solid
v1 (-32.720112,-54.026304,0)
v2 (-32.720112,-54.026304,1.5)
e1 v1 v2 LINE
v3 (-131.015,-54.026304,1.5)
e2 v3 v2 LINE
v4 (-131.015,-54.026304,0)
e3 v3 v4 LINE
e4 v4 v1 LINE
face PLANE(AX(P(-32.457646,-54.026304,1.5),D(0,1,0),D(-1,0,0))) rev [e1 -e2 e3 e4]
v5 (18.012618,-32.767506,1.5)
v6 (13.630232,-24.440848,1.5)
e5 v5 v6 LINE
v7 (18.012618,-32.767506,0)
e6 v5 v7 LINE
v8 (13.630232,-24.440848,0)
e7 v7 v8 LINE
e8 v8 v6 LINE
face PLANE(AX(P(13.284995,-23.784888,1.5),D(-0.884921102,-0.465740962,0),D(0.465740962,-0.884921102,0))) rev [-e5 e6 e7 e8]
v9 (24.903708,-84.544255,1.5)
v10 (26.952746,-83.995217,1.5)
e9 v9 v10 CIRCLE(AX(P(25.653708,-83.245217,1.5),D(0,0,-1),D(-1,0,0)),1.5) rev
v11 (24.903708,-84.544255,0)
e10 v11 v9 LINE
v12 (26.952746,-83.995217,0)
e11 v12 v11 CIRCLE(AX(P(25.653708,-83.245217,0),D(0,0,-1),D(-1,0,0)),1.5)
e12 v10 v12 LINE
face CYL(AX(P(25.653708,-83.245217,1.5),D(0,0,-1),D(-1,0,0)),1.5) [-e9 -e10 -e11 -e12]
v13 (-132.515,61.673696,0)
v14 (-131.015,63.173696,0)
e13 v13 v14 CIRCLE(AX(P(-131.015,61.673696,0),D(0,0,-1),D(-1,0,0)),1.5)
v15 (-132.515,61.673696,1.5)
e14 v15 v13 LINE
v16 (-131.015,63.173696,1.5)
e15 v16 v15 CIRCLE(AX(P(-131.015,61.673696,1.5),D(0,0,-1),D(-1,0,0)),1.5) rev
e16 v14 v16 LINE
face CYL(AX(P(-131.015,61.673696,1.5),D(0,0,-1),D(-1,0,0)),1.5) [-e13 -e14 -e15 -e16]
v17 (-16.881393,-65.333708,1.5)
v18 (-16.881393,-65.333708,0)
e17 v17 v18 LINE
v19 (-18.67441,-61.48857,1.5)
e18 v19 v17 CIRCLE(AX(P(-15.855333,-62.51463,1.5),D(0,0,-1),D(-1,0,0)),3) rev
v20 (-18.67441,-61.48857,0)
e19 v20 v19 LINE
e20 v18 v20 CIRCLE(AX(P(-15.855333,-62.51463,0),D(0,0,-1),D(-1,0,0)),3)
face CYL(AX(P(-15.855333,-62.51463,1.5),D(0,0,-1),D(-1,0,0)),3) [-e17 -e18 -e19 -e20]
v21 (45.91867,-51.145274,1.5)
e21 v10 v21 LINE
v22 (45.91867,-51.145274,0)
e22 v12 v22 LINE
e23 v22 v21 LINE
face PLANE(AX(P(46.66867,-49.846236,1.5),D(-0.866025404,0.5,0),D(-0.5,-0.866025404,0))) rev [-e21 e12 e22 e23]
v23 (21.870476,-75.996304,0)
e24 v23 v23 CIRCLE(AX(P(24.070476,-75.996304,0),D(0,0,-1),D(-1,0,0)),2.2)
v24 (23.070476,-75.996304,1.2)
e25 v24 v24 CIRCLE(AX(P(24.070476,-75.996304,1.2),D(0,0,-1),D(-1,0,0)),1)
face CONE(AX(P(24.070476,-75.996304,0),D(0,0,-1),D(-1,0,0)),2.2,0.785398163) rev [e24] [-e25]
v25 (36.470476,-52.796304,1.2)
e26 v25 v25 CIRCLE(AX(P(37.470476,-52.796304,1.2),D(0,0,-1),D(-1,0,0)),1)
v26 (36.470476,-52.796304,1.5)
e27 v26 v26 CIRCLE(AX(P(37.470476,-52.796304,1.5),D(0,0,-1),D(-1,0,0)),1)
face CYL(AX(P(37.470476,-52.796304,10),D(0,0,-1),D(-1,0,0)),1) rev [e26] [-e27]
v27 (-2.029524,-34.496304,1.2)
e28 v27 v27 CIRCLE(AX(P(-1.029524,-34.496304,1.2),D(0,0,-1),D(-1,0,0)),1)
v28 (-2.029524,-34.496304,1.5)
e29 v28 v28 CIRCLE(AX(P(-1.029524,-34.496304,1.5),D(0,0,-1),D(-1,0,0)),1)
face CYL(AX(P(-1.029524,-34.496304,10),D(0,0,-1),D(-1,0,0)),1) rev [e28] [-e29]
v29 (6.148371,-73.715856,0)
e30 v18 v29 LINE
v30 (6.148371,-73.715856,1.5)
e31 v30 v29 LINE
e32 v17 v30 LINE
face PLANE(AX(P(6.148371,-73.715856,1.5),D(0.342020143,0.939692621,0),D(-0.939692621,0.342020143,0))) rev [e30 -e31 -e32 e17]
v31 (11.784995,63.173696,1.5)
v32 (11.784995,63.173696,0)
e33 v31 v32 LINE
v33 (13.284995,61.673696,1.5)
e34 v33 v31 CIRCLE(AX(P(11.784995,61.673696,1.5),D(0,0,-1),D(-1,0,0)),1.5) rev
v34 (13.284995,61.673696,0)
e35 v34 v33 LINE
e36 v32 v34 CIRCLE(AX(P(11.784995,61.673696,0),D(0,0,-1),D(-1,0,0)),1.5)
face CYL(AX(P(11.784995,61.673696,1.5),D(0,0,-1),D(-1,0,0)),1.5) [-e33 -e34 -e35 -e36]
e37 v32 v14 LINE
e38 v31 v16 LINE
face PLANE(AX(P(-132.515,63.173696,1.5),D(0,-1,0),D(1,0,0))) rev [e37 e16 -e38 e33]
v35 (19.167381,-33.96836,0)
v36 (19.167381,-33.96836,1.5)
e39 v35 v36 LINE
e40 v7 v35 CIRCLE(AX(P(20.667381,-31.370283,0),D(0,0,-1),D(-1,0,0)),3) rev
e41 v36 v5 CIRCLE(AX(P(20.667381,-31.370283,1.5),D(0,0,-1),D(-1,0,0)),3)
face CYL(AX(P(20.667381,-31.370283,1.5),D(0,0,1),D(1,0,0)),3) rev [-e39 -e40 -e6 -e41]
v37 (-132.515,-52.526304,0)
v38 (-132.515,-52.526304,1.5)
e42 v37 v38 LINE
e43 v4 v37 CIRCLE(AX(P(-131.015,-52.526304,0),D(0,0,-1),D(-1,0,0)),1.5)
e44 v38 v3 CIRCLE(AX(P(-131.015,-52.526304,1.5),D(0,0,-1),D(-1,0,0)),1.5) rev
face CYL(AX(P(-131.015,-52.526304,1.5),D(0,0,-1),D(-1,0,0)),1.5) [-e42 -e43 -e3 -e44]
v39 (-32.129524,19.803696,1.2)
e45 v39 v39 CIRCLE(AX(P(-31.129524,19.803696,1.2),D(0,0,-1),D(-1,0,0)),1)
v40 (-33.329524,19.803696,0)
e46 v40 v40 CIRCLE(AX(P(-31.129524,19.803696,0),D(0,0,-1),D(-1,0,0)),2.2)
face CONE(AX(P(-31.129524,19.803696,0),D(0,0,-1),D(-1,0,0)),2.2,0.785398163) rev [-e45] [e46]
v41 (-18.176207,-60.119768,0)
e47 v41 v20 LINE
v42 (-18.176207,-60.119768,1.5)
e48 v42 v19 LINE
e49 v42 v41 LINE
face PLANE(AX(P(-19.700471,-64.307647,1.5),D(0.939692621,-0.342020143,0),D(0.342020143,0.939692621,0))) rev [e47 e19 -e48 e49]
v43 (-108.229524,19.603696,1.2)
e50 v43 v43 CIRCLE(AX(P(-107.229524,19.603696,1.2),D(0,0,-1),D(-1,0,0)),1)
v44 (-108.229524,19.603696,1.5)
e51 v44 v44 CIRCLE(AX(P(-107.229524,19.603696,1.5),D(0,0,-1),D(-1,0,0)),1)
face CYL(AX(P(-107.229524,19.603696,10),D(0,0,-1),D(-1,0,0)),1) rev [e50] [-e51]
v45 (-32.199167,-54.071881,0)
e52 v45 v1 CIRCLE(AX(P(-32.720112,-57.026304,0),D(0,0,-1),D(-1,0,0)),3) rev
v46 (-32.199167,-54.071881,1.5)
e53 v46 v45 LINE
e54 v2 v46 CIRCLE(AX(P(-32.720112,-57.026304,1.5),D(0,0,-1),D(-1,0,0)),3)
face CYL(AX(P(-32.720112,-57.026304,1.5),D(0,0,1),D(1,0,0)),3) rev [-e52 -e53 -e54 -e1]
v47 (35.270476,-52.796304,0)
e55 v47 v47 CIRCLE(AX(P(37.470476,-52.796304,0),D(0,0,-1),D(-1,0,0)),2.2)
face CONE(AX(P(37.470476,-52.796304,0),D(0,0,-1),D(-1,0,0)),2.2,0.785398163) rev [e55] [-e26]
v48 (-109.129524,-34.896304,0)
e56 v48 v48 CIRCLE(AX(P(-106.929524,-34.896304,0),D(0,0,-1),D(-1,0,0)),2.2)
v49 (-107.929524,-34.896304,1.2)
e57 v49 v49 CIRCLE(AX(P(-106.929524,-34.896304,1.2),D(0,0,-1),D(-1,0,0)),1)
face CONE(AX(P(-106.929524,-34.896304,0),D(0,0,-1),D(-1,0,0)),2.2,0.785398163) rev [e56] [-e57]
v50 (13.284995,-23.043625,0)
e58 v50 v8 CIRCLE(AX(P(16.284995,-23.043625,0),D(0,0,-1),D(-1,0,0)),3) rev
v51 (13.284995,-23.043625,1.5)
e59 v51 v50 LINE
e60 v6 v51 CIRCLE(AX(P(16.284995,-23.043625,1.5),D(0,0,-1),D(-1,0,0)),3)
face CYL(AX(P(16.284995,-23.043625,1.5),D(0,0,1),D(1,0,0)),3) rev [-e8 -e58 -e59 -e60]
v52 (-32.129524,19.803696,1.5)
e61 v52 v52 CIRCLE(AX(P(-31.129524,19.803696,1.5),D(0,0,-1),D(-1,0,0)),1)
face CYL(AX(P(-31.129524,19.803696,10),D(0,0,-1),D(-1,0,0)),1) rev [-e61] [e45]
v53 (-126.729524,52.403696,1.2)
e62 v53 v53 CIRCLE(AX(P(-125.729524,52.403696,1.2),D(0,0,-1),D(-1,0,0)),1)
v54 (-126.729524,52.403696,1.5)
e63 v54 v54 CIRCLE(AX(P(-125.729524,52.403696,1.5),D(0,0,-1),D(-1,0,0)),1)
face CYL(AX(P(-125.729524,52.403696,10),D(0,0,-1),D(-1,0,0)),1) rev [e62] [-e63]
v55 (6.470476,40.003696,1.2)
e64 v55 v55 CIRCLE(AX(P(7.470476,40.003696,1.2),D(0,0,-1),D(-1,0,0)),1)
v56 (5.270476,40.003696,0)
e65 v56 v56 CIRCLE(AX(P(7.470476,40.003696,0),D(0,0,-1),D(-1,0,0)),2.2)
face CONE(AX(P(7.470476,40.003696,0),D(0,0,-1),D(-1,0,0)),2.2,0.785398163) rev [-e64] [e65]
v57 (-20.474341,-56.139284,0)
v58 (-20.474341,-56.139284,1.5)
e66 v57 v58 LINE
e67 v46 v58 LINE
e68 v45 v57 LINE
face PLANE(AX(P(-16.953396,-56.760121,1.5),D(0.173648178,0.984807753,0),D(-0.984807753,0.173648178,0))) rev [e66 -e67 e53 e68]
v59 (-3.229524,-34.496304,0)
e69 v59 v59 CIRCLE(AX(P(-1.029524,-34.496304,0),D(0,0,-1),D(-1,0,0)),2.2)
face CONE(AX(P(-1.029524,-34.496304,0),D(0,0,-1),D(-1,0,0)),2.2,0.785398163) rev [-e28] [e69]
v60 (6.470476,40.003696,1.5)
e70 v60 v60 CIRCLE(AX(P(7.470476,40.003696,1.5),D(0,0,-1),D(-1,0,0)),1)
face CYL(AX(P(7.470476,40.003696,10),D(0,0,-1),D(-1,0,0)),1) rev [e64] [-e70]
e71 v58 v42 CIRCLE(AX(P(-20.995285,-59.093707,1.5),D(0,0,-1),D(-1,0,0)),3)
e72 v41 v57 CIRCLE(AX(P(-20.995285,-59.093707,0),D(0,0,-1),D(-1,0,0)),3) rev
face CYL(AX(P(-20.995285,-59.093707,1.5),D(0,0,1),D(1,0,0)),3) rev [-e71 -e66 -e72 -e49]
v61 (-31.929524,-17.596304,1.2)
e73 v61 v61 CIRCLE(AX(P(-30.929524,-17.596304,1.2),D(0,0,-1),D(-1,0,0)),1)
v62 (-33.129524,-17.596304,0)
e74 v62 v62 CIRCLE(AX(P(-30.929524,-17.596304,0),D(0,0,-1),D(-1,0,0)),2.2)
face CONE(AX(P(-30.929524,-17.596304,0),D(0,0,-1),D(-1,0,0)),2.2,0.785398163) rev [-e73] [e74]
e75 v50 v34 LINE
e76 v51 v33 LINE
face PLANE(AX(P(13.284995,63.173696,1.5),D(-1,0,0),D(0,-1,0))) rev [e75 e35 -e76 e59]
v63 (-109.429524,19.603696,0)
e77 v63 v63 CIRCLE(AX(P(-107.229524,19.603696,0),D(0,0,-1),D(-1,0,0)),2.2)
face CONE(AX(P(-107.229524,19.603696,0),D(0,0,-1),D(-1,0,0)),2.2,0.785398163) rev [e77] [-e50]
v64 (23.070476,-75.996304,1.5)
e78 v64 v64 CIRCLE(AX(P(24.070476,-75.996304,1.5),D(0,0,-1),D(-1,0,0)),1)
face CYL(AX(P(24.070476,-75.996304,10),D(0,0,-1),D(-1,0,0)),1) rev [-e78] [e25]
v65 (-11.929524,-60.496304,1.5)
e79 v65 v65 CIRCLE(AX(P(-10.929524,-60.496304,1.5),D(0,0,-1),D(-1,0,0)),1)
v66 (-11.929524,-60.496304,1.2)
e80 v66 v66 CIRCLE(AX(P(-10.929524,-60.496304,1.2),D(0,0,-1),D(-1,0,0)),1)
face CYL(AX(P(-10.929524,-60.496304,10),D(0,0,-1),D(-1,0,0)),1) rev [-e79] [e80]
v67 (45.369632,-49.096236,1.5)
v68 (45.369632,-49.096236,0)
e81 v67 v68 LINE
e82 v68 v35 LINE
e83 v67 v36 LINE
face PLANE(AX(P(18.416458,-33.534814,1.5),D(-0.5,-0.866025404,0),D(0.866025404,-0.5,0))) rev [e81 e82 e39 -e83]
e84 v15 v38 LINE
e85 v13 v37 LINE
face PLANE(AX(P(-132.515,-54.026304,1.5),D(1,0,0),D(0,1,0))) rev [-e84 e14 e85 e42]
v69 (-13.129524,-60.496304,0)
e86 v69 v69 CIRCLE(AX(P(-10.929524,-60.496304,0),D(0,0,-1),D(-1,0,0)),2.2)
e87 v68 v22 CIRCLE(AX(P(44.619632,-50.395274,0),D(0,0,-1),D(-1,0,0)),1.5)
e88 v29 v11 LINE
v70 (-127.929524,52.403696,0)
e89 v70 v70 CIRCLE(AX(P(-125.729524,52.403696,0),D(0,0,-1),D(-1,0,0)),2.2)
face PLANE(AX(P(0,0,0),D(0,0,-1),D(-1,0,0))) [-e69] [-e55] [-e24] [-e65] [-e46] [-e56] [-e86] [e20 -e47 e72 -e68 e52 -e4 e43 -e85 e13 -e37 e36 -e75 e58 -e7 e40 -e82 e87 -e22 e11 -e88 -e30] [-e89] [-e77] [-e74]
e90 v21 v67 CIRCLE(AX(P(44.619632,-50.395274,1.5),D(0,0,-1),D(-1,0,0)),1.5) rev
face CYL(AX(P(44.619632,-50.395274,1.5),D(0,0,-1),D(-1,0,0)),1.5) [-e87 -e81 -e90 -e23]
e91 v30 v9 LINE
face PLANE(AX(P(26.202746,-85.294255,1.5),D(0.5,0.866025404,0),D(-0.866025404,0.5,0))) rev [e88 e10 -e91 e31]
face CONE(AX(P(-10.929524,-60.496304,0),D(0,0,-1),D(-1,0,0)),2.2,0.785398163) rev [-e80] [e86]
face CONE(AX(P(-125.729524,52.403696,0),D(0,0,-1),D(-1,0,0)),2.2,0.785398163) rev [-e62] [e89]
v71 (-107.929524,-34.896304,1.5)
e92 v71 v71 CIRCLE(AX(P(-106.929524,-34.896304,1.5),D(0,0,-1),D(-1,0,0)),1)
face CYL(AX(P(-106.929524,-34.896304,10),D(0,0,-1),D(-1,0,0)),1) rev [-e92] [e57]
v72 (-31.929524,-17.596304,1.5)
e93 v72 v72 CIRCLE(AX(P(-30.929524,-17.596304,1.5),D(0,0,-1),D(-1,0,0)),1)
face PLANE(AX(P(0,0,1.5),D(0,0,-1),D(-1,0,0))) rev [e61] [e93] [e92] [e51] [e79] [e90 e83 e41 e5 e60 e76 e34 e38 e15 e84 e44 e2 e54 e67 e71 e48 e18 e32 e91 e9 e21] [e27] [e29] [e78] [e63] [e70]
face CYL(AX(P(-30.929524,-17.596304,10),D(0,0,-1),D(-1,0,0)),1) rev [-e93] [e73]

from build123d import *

# Parameters (mm, degrees)
BOSS_EXTRUDE1_DEPTH = 1.5
SKETCH6_R           = 1
CUT_EXTRUDE1_DEPTH  = 10
FILLET4_R           = 1.5
FILLET5_R           = 3


# Read off the part's stored shape, not the designer's step: AdvancedHole1
with BuildPart() as part:
    # Sketch1 → Boss-Extrude1 (new body)
    with BuildSketch(Plane.XY):
        Polygon((-132.514999879, 63.173696093), (13.284995002, 63.173696093), (13.284995002, -23.784888353), (18.416457767, -33.534813854), (46.668669763, -49.846236055), (26.202746282, -85.294255348), (6.148371034, -73.7158564), (-19.700470814, -64.307647377), (-16.953396025, -56.760121426), (-32.457645619, -54.026303907), (-132.514999879, -54.026303907), align=None)
    extrude(amount=BOSS_EXTRUDE1_DEPTH)

    # Sketch6 → Cut-Extrude1 (cut)
    with BuildSketch(Plane(origin=(0, 0, 0), x_dir=(-1, 0, 0), z_dir=(0, 0, -1))):
        with Locations((125.729523879, 52.403696093)):
            Circle(SKETCH6_R)
        with Locations((106.929523879, -34.896303907)):
            Circle(SKETCH6_R)
        with Locations((30.929523879, -17.596303907)):
            Circle(SKETCH6_R)
        with Locations((31.129523879, 19.803696093)):
            Circle(SKETCH6_R)
        with Locations((-7.470476121, 40.003696093)):
            Circle(SKETCH6_R)
        with Locations((1.029523879, -34.496303907)):
            Circle(SKETCH6_R)
        with Locations((10.929523879, -60.496303907)):
            Circle(SKETCH6_R)
        with Locations((-37.470476121, -52.796303907)):
            Circle(SKETCH6_R)
        with Locations((-24.070476121, -75.996303907)):
            Circle(SKETCH6_R)
        with Locations((107.229523879, 19.603696093)):
            Circle(SKETCH6_R)
    extrude(amount=-CUT_EXTRUDE1_DEPTH, mode=Mode.SUBTRACT)

    # AdvancedHole1 outline → AdvancedHole1 (revolve, cut)
    with BuildSketch(Plane(origin=(37.470476121, -52.796303907, 0), x_dir=(1, 0, 0), z_dir=(0, -1, 0))):
        Polygon((2.2, 0), (1, 1.2), (1, 0), align=None)
    revolve(axis=Axis((37.470476121, -52.796303907, 0), (0, 0, 1)), mode=Mode.SUBTRACT)

    # AdvancedHole1 2 outline → AdvancedHole1 2 (revolve, cut)
    with BuildSketch(Plane(origin=(24.070476121, -75.996303907, 0), x_dir=(1, 0, 0), z_dir=(0, -1, 0))):
        Polygon((2.2, 0), (1, 1.2), (1, 0), align=None)
    revolve(axis=Axis((24.070476121, -75.996303907, 0), (0, 0, 1)), mode=Mode.SUBTRACT)

    # AdvancedHole1 3 outline → AdvancedHole1 3 (revolve, cut)
    with BuildSketch(Plane(origin=(-10.929523879, -60.496303907, 0), x_dir=(1, 0, 0), z_dir=(0, -1, 0))):
        Polygon((2.2, 0), (1, 1.2), (1, 0), align=None)
    revolve(axis=Axis((-10.929523879, -60.496303907, 0), (0, 0, 1)), mode=Mode.SUBTRACT)

    # AdvancedHole1 4 outline → AdvancedHole1 4 (revolve, cut)
    with BuildSketch(Plane(origin=(-1.029523879, -34.496303907, 0), x_dir=(1, 0, 0), z_dir=(0, -1, 0))):
        Polygon((2.2, 0), (1, 1.2), (1, 0), align=None)
    revolve(axis=Axis((-1.029523879, -34.496303907, 0), (0, 0, 1)), mode=Mode.SUBTRACT)

    # AdvancedHole1 5 outline → AdvancedHole1 5 (revolve, cut)
    with BuildSketch(Plane(origin=(-30.929523879, -17.596303907, 0), x_dir=(1, 0, 0), z_dir=(0, -1, 0))):
        Polygon((2.2, 0), (1, 1.2), (1, 0), align=None)
    revolve(axis=Axis((-30.929523879, -17.596303907, 0), (0, 0, 1)), mode=Mode.SUBTRACT)

    # AdvancedHole1 6 outline → AdvancedHole1 6 (revolve, cut)
    with BuildSketch(Plane(origin=(-106.929523879, -34.896303907, 0), x_dir=(1, 0, 0), z_dir=(0, -1, 0))):
        Polygon((2.2, 0), (1, 1.2), (1, 0), align=None)
    revolve(axis=Axis((-106.929523879, -34.896303907, 0), (0, 0, 1)), mode=Mode.SUBTRACT)

    # AdvancedHole1 7 outline → AdvancedHole1 7 (revolve, cut)
    with BuildSketch(Plane(origin=(-125.729523879, 52.403696093, 0), x_dir=(1, 0, 0), z_dir=(0, -1, 0))):
        Polygon((2.2, 0), (1, 1.2), (1, 0), align=None)
    revolve(axis=Axis((-125.729523879, 52.403696093, 0), (0, 0, 1)), mode=Mode.SUBTRACT)

    # AdvancedHole1 8 outline → AdvancedHole1 8 (revolve, cut)
    with BuildSketch(Plane(origin=(-31.129523879, 19.803696093, 0), x_dir=(1, 0, 0), z_dir=(0, -1, 0))):
        Polygon((2.2, 0), (1, 1.2), (1, 0), align=None)
    revolve(axis=Axis((-31.129523879, 19.803696093, 0), (0, 0, 1)), mode=Mode.SUBTRACT)

    # AdvancedHole1 9 outline → AdvancedHole1 9 (revolve, cut)
    with BuildSketch(Plane(origin=(-107.229523879, 19.603696093, 0), x_dir=(1, 0, 0), z_dir=(0, -1, 0))):
        Polygon((2.2, 0), (1, 1.2), (1, 0), align=None)
    revolve(axis=Axis((-107.229523879, 19.603696093, 0), (0, 0, 1)), mode=Mode.SUBTRACT)

    # AdvancedHole1 10 outline → AdvancedHole1 10 (revolve, cut)
    with BuildSketch(Plane(origin=(7.470476121, 40.003696093, 0), x_dir=(1, 0, 0), z_dir=(0, -1, 0))):
        Polygon((2.2, 0), (1, 1.2), (1, 0), align=None)
    revolve(axis=Axis((7.470476121, 40.003696093, 0), (0, 0, 1)), mode=Mode.SUBTRACT)

    # Fillet4
    fillet4_edges = [part.edges().sort_by_distance(p)[0] for p in [
        (-132.514999879, 63.173696093, 0.75),
        (13.284995002, 63.173696093, 0.75),
        (46.668669763, -49.846236055, 0.75),
        (26.202746282, -85.294255348, 0.75),
        (-132.514999879, -54.026303907, 0.75),
    ]]
    fillet(fillet4_edges, radius=FILLET4_R)

    # Fillet5
    fillet5_edges = [part.edges().sort_by_distance(p)[0] for p in [
        (13.284995002, -23.784888353, 0.75),
        (18.416457767, -33.534813854, 0.75),
        (-19.700470814, -64.307647377, 0.75),
        (-16.953396025, -56.760121426, 0.75),
        (-32.457645619, -54.026303907, 0.75),
    ]]
    fillet(fillet5_edges, radius=FILLET5_R)


solid = part.part
